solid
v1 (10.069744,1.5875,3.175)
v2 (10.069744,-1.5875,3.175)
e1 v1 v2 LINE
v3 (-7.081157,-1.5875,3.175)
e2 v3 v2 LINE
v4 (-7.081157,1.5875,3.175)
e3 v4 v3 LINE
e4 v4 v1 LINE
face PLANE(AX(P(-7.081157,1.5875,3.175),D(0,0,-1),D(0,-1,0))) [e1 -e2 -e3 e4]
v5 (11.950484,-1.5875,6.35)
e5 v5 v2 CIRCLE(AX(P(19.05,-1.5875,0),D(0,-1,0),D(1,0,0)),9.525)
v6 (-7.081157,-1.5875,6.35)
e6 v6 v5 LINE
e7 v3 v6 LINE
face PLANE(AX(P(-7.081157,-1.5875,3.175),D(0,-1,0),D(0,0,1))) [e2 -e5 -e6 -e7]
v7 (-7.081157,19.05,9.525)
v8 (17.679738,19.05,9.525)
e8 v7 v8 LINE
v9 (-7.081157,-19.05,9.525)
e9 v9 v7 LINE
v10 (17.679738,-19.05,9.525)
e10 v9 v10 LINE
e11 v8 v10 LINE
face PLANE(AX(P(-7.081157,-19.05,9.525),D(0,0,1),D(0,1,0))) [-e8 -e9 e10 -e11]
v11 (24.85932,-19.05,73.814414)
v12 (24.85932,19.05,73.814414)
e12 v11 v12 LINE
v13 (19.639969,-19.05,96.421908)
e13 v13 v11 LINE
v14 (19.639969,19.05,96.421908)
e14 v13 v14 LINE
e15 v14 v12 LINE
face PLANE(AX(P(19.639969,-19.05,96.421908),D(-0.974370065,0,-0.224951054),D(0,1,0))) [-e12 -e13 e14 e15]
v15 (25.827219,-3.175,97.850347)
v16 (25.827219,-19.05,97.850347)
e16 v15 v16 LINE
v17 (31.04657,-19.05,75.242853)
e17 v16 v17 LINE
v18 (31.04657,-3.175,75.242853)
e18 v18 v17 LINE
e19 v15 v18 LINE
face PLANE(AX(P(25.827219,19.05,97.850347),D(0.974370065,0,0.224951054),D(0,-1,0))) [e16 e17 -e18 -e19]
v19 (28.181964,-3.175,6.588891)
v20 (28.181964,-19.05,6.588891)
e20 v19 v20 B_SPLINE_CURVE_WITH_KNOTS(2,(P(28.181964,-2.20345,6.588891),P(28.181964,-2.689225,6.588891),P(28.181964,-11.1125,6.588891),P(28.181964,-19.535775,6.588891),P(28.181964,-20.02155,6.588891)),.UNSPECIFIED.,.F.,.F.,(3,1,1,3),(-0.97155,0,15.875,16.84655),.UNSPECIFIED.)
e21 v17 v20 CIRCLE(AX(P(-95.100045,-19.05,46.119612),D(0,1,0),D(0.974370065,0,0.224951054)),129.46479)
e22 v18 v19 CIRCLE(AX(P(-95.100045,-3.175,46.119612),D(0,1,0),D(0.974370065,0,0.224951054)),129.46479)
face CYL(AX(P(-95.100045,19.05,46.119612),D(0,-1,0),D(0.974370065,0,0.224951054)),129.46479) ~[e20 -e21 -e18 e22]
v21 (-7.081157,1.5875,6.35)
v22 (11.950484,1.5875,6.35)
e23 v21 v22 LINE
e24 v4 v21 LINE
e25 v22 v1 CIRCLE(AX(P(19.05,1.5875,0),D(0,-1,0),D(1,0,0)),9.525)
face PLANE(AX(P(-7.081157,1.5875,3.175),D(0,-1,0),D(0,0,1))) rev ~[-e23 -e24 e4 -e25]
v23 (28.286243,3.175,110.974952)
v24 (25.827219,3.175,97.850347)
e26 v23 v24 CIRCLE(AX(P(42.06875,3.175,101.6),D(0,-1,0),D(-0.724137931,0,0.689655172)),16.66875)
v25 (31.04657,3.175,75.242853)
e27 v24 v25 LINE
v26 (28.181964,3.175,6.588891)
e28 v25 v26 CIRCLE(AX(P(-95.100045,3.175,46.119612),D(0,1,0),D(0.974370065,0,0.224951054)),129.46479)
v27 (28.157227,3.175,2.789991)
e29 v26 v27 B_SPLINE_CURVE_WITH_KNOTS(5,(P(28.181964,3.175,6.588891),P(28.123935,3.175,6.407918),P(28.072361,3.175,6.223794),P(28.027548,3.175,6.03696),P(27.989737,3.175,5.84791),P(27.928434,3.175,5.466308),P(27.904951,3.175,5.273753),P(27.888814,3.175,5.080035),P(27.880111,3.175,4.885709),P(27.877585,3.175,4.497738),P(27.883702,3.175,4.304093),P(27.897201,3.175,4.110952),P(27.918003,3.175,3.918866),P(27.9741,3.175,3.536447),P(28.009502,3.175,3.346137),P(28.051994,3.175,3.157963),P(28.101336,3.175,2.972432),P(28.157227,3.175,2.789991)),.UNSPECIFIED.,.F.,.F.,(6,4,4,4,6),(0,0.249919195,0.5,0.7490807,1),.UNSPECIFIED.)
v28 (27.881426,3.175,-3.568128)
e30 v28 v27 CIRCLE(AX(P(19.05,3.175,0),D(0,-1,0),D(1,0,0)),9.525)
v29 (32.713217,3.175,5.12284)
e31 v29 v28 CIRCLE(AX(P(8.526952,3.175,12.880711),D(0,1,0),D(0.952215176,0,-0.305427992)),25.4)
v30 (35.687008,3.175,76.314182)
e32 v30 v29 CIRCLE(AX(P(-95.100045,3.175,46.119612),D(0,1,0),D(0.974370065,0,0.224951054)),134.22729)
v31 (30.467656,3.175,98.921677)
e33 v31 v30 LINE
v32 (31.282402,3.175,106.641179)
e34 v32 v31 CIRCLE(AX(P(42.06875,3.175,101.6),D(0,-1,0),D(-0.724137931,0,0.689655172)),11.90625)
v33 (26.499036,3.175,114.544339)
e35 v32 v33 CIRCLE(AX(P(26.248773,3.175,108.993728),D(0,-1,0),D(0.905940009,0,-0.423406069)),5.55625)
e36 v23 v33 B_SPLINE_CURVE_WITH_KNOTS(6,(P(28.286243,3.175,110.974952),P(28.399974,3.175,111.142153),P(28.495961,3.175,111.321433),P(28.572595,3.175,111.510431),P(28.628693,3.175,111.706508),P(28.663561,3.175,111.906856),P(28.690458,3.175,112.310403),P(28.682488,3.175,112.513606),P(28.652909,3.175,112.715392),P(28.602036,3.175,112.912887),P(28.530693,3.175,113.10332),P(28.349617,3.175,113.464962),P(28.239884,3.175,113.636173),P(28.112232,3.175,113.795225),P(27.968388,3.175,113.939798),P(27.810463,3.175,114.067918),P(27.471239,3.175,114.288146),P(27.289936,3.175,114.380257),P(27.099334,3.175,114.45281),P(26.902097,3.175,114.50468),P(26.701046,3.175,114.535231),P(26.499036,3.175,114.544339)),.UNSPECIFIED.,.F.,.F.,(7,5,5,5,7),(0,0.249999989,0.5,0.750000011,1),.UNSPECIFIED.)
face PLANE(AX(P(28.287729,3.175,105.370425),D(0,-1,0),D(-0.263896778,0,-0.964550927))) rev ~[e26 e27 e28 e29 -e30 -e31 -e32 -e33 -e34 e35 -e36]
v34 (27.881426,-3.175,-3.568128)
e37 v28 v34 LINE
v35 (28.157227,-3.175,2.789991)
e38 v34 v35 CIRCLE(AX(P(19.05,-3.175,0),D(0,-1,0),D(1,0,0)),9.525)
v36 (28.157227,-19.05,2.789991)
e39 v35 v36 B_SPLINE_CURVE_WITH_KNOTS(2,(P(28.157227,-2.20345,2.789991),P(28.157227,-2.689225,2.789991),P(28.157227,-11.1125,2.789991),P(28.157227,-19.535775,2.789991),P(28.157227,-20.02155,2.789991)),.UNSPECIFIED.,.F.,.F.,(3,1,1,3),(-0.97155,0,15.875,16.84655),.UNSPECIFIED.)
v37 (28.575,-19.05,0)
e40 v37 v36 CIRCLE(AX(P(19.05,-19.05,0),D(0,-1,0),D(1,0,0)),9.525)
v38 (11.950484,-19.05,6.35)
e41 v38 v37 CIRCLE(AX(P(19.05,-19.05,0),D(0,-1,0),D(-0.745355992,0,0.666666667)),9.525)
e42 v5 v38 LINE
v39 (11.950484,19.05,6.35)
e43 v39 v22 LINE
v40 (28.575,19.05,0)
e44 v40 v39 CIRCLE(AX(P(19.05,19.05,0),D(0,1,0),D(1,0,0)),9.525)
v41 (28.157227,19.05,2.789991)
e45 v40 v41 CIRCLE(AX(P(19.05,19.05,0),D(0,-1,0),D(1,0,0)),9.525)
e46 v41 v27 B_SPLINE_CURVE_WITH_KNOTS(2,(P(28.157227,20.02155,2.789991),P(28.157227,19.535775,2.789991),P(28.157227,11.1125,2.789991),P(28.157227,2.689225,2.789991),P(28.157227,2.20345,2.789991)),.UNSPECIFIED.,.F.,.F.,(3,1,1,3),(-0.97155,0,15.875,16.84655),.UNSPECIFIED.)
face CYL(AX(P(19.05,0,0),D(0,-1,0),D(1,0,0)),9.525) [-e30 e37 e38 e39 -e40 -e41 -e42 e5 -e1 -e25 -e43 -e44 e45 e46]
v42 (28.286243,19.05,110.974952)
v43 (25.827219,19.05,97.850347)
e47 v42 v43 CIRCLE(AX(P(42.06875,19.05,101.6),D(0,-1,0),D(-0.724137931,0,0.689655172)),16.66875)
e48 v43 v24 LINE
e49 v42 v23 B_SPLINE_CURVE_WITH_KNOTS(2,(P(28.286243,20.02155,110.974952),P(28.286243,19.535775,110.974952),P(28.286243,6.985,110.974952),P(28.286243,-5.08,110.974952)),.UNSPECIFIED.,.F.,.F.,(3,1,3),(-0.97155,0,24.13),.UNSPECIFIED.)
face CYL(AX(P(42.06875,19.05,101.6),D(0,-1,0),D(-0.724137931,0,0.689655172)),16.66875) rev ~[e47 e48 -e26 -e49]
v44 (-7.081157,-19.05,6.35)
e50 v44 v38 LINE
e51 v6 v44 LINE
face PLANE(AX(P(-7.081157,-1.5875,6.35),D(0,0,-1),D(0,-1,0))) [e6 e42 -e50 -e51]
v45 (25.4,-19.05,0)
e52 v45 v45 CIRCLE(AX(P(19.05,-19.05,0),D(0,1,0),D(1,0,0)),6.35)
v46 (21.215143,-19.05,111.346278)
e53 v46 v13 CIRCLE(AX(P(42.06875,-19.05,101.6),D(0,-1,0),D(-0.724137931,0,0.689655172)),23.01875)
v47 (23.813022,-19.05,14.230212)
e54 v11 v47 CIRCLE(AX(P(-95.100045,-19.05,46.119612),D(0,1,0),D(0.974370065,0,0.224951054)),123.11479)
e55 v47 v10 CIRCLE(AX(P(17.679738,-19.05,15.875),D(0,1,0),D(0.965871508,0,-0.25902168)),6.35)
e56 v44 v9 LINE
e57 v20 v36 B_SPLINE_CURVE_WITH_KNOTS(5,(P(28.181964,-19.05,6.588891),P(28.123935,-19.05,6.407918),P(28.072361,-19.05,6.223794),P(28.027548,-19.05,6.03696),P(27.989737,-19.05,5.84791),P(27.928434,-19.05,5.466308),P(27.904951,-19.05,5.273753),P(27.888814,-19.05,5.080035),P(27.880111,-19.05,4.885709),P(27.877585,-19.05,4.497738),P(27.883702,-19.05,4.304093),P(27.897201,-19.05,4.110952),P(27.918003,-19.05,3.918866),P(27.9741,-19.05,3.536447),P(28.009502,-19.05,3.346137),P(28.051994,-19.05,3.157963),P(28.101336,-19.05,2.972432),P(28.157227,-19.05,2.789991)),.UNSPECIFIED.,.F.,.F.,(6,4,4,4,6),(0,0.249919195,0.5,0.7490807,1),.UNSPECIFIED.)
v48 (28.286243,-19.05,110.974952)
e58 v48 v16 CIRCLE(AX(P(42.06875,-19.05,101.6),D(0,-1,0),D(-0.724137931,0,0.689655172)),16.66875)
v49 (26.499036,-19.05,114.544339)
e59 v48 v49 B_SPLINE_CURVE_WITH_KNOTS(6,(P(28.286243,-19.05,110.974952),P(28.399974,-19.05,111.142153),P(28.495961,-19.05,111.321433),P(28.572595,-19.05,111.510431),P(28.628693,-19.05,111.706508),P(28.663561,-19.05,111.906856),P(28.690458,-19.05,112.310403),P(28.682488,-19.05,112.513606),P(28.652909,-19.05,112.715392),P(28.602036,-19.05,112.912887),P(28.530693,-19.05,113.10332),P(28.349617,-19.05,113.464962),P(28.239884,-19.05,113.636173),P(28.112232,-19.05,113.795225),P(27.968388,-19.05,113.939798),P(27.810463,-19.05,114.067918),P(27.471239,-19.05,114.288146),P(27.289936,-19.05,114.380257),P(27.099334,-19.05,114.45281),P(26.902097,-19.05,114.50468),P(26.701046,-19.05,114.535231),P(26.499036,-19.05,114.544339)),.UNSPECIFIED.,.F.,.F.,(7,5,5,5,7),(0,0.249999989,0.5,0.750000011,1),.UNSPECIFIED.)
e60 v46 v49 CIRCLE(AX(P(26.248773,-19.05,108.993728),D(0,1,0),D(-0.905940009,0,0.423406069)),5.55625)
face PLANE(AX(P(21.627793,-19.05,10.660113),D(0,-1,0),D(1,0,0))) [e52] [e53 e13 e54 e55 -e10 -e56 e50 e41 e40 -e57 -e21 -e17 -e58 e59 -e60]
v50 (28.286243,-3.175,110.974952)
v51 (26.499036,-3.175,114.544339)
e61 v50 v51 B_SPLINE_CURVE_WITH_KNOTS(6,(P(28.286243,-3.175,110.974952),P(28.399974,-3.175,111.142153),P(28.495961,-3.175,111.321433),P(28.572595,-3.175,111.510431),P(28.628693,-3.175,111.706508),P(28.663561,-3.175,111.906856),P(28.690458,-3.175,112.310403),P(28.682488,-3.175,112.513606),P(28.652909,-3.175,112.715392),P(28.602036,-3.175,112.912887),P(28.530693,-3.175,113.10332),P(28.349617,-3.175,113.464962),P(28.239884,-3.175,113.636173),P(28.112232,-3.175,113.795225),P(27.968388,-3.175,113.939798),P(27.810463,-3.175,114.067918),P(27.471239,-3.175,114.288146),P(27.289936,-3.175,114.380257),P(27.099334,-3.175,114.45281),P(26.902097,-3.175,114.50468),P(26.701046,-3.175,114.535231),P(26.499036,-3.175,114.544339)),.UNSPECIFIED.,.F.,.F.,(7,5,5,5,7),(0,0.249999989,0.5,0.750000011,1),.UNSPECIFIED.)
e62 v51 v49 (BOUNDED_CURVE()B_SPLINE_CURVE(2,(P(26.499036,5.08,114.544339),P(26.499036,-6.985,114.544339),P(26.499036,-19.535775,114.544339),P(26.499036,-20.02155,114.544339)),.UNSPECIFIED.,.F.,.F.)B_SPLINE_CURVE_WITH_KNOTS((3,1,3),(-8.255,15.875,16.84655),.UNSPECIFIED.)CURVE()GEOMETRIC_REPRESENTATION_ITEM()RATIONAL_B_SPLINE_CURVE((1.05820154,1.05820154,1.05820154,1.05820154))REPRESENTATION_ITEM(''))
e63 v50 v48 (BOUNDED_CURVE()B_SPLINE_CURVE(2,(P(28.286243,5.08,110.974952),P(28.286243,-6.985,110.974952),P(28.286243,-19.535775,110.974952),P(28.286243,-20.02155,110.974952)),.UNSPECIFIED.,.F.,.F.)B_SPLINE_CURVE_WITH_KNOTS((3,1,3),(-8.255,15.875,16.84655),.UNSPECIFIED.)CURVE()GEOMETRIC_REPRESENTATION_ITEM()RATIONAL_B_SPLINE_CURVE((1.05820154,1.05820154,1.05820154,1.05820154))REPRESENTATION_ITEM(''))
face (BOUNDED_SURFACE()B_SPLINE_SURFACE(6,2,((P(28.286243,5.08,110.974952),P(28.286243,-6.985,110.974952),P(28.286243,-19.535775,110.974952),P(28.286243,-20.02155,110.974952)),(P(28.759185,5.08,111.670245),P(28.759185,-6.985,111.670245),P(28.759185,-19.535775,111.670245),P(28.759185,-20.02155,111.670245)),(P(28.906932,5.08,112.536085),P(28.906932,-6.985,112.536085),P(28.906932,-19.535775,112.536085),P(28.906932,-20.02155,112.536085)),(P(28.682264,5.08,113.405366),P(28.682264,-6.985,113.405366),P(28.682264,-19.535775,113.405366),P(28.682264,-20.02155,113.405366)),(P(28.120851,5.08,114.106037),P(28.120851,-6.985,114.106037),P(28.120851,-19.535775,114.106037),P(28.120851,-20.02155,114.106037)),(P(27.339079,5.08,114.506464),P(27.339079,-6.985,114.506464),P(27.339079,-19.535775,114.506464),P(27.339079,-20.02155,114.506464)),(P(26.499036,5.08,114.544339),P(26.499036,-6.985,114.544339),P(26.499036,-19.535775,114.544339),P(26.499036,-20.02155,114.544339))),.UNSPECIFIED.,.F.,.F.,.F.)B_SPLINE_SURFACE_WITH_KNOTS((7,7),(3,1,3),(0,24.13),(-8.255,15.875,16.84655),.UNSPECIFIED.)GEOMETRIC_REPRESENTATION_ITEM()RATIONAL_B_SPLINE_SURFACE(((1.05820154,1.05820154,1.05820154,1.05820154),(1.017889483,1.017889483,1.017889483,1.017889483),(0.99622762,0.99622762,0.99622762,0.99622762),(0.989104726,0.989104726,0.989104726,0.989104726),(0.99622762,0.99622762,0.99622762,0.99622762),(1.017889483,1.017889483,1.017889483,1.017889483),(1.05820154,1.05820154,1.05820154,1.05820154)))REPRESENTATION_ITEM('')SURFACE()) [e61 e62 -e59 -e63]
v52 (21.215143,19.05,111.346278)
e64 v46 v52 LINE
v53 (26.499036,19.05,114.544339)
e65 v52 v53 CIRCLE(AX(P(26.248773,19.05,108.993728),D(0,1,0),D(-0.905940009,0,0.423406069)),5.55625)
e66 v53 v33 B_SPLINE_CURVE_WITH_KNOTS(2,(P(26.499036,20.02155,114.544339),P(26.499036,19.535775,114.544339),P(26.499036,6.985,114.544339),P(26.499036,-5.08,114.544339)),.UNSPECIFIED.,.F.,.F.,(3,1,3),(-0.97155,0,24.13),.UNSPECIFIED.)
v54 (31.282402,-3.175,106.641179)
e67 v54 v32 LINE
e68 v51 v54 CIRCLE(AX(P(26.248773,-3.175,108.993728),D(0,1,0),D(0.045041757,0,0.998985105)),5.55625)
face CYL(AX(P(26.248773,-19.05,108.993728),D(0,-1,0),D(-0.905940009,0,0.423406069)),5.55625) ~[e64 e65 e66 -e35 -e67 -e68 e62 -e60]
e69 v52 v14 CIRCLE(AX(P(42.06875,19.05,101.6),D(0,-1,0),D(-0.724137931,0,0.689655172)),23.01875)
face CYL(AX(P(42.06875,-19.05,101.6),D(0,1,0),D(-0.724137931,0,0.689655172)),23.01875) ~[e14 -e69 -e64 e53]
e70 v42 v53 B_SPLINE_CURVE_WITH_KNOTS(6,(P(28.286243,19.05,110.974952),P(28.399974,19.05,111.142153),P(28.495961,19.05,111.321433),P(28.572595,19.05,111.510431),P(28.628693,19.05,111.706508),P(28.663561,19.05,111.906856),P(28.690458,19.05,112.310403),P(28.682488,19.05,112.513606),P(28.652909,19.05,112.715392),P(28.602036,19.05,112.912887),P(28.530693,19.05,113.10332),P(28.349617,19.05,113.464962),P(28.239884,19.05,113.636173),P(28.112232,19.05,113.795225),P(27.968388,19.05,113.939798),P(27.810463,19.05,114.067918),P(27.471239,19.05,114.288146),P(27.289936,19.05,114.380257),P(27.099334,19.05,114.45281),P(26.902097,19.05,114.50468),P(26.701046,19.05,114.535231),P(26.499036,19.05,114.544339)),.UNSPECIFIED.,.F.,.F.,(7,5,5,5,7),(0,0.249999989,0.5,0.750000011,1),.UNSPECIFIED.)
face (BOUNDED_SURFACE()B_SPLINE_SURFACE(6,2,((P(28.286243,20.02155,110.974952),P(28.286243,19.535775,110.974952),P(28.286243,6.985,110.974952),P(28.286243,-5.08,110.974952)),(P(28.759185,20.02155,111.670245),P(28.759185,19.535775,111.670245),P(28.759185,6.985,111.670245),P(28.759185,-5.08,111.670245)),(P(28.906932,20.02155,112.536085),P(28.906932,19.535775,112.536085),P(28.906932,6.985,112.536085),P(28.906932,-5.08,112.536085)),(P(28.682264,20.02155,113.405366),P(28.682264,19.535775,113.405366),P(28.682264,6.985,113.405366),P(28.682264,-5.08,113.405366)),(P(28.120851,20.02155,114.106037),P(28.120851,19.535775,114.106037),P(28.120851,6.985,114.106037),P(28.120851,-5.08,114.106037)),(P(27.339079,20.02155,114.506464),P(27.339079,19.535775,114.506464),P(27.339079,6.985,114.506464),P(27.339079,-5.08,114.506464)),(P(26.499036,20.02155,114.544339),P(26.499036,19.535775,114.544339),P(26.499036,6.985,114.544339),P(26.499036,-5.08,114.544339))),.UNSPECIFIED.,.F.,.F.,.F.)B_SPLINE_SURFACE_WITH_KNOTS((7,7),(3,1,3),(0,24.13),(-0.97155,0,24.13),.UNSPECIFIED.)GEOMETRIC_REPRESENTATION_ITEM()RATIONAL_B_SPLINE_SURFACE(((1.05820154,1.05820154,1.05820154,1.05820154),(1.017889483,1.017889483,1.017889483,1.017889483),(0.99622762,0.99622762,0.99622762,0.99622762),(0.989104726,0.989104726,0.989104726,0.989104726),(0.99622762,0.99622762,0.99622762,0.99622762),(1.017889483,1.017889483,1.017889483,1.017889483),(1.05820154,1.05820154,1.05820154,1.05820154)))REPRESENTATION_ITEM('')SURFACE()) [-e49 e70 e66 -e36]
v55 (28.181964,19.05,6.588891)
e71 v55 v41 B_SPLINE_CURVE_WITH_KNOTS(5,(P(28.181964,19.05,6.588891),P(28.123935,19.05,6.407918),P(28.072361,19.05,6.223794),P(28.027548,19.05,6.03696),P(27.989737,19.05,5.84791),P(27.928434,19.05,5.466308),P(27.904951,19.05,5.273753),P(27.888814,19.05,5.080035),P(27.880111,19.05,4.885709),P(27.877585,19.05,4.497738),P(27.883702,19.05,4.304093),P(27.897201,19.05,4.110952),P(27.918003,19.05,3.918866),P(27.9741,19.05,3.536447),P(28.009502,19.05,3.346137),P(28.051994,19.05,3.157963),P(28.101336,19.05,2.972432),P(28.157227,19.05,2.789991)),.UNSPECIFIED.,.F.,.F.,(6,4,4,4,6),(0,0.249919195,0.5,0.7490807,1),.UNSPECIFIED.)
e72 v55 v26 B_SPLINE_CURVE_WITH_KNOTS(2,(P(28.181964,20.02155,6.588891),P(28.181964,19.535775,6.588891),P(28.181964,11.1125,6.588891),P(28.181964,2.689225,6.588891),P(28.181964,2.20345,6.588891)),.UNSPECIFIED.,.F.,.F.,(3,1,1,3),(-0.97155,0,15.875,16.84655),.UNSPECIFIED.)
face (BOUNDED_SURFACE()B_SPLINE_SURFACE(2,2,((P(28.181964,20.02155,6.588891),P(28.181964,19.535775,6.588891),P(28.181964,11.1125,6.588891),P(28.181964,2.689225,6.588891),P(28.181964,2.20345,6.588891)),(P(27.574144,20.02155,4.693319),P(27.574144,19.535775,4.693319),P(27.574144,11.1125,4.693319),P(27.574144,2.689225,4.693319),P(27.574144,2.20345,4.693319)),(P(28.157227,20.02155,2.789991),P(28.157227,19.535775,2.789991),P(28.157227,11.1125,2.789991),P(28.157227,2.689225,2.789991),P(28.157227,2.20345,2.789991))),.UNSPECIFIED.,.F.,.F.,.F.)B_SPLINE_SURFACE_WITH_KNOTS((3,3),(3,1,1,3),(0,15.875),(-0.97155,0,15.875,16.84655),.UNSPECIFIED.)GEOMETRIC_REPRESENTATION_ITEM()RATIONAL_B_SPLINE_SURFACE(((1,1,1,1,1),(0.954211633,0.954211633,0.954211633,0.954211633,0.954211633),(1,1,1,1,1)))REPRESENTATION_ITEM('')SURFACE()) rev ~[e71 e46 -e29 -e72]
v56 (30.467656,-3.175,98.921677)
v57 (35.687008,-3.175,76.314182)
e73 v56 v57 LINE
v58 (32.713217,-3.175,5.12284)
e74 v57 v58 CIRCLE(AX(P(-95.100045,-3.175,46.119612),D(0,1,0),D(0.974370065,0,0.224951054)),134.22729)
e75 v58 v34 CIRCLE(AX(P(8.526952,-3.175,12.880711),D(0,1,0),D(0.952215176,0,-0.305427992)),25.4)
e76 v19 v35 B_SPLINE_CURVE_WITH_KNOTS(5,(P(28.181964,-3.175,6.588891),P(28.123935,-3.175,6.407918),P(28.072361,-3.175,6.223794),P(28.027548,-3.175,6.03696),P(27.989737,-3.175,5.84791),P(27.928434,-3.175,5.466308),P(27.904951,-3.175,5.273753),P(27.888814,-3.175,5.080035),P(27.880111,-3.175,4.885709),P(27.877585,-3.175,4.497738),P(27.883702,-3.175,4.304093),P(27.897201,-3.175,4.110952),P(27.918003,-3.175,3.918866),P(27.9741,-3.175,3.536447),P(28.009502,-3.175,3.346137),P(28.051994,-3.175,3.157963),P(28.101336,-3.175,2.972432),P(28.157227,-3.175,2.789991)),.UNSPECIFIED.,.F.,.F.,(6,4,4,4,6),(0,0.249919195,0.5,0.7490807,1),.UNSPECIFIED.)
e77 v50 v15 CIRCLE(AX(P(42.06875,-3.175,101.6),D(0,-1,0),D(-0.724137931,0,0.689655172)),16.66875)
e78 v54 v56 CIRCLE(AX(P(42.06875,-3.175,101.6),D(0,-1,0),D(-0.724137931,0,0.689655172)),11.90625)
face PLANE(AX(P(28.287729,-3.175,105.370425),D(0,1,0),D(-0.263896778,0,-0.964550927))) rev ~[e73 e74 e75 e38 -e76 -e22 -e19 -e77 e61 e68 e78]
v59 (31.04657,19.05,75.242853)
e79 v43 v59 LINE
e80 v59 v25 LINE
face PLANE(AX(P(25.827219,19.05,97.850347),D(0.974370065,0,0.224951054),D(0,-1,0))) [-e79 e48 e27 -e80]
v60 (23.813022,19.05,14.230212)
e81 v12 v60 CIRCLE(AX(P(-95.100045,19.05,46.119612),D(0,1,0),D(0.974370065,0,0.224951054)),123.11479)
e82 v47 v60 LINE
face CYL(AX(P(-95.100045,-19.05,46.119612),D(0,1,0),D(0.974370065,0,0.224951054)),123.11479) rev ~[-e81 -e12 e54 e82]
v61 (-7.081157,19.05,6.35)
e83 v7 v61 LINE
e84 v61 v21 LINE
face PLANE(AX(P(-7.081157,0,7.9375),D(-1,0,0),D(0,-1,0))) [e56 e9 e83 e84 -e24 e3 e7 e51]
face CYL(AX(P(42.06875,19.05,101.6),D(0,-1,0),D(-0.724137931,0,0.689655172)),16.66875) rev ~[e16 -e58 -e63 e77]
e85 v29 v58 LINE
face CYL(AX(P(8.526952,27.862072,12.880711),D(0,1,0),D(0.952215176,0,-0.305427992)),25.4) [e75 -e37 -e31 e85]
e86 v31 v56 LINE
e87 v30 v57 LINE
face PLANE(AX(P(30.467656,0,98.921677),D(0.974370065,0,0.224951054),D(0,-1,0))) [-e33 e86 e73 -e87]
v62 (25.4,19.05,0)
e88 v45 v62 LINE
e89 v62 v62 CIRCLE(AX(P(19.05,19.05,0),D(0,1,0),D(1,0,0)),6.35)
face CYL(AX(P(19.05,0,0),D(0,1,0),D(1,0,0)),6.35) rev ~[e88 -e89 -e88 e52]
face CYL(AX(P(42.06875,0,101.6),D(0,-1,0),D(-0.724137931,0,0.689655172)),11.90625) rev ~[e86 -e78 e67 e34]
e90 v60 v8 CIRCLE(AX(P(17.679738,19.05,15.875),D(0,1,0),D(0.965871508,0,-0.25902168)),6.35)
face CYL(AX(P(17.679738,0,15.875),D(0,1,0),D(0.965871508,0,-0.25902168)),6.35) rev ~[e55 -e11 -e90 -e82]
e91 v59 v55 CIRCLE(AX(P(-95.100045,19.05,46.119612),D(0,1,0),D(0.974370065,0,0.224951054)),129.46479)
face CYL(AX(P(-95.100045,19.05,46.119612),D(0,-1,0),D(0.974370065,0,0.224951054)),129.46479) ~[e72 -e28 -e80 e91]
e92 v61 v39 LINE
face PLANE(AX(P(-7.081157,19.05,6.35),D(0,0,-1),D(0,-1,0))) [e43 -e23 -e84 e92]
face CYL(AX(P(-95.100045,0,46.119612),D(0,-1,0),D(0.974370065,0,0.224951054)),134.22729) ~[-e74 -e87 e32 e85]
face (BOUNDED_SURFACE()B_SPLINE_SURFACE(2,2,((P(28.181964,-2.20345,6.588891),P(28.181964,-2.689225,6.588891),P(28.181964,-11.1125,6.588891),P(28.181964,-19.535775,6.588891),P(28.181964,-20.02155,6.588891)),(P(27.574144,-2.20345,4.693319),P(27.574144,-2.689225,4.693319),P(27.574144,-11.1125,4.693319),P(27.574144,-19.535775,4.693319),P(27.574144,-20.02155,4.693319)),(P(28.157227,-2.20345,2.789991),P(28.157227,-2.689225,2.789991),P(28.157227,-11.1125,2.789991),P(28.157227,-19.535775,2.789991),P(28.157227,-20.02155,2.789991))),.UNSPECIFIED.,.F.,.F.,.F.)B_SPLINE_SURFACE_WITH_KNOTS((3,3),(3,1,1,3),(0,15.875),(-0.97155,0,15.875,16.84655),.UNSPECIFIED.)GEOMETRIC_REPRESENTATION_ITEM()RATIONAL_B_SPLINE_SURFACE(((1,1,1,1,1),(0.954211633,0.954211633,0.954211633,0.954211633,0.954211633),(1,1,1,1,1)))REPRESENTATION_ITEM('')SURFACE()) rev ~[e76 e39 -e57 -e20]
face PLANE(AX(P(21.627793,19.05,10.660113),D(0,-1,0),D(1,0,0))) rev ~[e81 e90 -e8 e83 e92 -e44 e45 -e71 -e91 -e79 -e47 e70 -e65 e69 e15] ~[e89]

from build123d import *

# Parameters (mm, degrees)
F1_DEPTH     = 19.05
F3_W         = 4.7625
F3_H         = 6.35
F6_DEPTH     = 38.1
F8_W         = 3.175
F8_H         = 3.175
F10_R        = 6.35
F11_DEPTH    = 194
F12_R        = 2.286
F13_T1_DEPTH = 19.05
F13_T3_DEPTH = 19.05
F14_T1_DEPTH = 55.7241448987
F15_R        = 6.35


# Not quite as in the source:
# - a fillet or chamfer that OpenCascade refuses, or shapes differently, is made with other operations: its cross-section is extruded or revolved along the edge and cut away or added
# - an extrude ends at something that could not be found from the text; its depth is read off the source's solid


with BuildPart() as f1:
    # F0 (on Front) → F1 (new body, symmetric)
    with BuildSketch(Plane.XZ):
        with BuildLine():
            ThreePointArc((28.575, 0), (26.8420658771, 5.4780776161), (22.2738274294, 8.962843394))
            ThreePointArc((22.2738274294, 8.962843394), (20.6862367909, 9.3834084513), (19.05, 9.525))
            ThreePointArc((19.05, 9.525), (12.3148079092, -6.7351920908), (28.575, 0))
        make_face()
        with BuildLine():
            ThreePointArc((21.2761253017, 5.9470048042), (24.2681603878, 3.6184668255), (25.4, 0))
            ThreePointArc((25.4, 0), (13.8318396122, -3.6184668255), (21.2761253017, 5.9470048042))
        make_face(mode=Mode.SUBTRACT)
    extrude(amount=F1_DEPTH, both=True)

    # F4: sweep along a path in F0
    with BuildLine(Plane.XZ) as f4_path:
        ThreePointArc((25.4, 117.475), (19.8659933528, 107.6745739625), (19.6399690712, 96.4219079178))
        Line((19.6399690712, 96.4219079178), (24.8593203517, 73.814413767))
        ThreePointArc((24.8593203517, 73.814413767), (27.6352226284, 36.4601369227), (19.05, 0))
    # F3 (on line) → F4 (sweep)
    with BuildSketch(Plane(origin=(70.7485136742, 0, 74.2859393579), x_dir=(0.724137931, 0, -0.6896551724), z_dir=(-0.6896551724, 0, -0.724137931))):
        Polygon((-56.274137931, 19.05), (-62.624137931, 19.05), (-62.624137931, -19.05), (-56.274137931, -19.05), (-56.274137931, -3.175), (-56.274137931, 3.175), align=None)
        with Locations((-53.892887931, 0)):
            Rectangle(F3_W, F3_H)
    sweep(path=f4_path.line)

    # F5 (on face) → F6 (cut, through all)
    with BuildSketch(Plane.XZ.offset(19.05)):
        with BuildLine():
            ThreePointArc((21.2151434119, 111.3462784605), (28.6013225616, 114.0273576638), (31.2824017648, 106.6411785141))
            ThreePointArc((31.2824017648, 106.6411785141), (33.8815819119, 110.2445976054), (37.6208515055, 112.6442287212))
            Line((37.6208515055, 112.6442287212), (29.1868111498, 120.6766481076))
            ThreePointArc((29.1868111498, 120.6766481076), (24.5677298599, 116.5524963006), (21.2151434119, 111.3462784605))
        make_face()
    extrude(amount=-F6_DEPTH, mode=Mode.SUBTRACT)

    # F8 (on line) → F9 (join, up to the next surface of F1)
    with BuildSketch(Plane(origin=(-7.081156576, 0, 0), x_dir=(0, -1, 0), z_dir=(-1, 0, 0))):
        Polygon((19.05, 9.525), (-19.05, 9.525), (-19.05, 6.35), (-1.5875, 6.35), (1.5875, 6.35), (19.05, 6.35), align=None)
        with Locations((0, 4.7625)):
            Rectangle(F8_W, F8_H)
    extrude(until=Until.NEXT, dir=(1, 0, 0))

    # F10 (on face) → F11 (cut, through all)
    with BuildSketch(Plane.XZ.offset(19.05)):
        with Locations((19.05, 0)):
            Circle(F10_R)
    extrude(amount=-F11_DEPTH, mode=Mode.SUBTRACT)

    # F12
    f12_edges = [f1.edges().sort_by_distance(p)[0] for p in [
        (29.997472, -11.1125, 113.094846),
        (29.997472, 11.1125, 113.094846),
    ]]
    fillet(f12_edges, radius=F12_R)

    # F13: fillet of radius 6.35 on 1 edges, made by hand

    # F13_s2 → F13_t1 (join)
    with BuildSketch(Plane.XZ.offset(-19.05)):
        with BuildLine():
            ThreePointArc((23.8130222807, 14.2302123328), (21.5448448234, 10.8368008333), (17.6797382069, 9.525))
            Line((17.6797382069, 9.525), (17.6797382069, 8.89))
            ThreePointArc((17.6797382069, 8.89), (19.05, 8.89), (22.0589056007, 8.3653205011))
            Line((22.0589056007, 8.3653205011), (22.8792169958, 8.7711966544))
            ThreePointArc((22.8792169958, 8.7711966544), (23.68228697, 11.4098439061), (24.4263506881, 14.0657335661))
            Line((24.4263506881, 14.0657335661), (23.8130222807, 14.2302123328))
        make_face()
    extrude(amount=F13_T1_DEPTH)

    # F13_s4 → F13_t3 (join)
    with BuildSketch(Plane.XZ):
        with BuildLine():
            ThreePointArc((23.8130222807, 14.2302123328), (21.5448448234, 10.8368008333), (17.6797382069, 9.525))
            Line((17.6797382069, 9.525), (17.6797382069, 8.89))
            ThreePointArc((17.6797382069, 8.89), (19.05, 8.89), (22.0589056007, 8.3653205011))
            Line((22.0589056007, 8.3653205011), (22.8792169958, 8.7711966544))
            ThreePointArc((22.8792169958, 8.7711966544), (23.68228697, 11.4098439061), (24.4263506881, 14.0657335661))
            Line((24.4263506881, 14.0657335661), (23.8130222807, 14.2302123328))
        make_face()
    extrude(amount=F13_T3_DEPTH)

    # F14: fillet of radius 25.4 on 1 edges, made by hand

    # F14_s2 → F14_t1 (cut)
    with BuildSketch(Plane.XZ.offset(-27.8620724494)):
        with BuildLine():
            ThreePointArc((32.7132170359, 5.1228403953), (30.7267768935, 0.5385983152), (27.8814262147, -3.5681278023))
            Line((27.8814262147, -3.5681278023), (29.3533305839, -4.1628157693))
            ThreePointArc((29.3533305839, -4.1628157693), (31.1186935714, 0.4491043519), (32.7132170359, 5.1228403953))
        make_face()
    extrude(amount=F14_T1_DEPTH, mode=Mode.SUBTRACT)

    # F15
    f15_edges = [f1.edges().sort_by_distance(p)[0] for p in [
        (27.473994, -11.1125, 4.445441),
        (27.473994, 11.1125, 4.445441),
    ]]
    fillet(f15_edges, radius=F15_R)


solid = f1.part
